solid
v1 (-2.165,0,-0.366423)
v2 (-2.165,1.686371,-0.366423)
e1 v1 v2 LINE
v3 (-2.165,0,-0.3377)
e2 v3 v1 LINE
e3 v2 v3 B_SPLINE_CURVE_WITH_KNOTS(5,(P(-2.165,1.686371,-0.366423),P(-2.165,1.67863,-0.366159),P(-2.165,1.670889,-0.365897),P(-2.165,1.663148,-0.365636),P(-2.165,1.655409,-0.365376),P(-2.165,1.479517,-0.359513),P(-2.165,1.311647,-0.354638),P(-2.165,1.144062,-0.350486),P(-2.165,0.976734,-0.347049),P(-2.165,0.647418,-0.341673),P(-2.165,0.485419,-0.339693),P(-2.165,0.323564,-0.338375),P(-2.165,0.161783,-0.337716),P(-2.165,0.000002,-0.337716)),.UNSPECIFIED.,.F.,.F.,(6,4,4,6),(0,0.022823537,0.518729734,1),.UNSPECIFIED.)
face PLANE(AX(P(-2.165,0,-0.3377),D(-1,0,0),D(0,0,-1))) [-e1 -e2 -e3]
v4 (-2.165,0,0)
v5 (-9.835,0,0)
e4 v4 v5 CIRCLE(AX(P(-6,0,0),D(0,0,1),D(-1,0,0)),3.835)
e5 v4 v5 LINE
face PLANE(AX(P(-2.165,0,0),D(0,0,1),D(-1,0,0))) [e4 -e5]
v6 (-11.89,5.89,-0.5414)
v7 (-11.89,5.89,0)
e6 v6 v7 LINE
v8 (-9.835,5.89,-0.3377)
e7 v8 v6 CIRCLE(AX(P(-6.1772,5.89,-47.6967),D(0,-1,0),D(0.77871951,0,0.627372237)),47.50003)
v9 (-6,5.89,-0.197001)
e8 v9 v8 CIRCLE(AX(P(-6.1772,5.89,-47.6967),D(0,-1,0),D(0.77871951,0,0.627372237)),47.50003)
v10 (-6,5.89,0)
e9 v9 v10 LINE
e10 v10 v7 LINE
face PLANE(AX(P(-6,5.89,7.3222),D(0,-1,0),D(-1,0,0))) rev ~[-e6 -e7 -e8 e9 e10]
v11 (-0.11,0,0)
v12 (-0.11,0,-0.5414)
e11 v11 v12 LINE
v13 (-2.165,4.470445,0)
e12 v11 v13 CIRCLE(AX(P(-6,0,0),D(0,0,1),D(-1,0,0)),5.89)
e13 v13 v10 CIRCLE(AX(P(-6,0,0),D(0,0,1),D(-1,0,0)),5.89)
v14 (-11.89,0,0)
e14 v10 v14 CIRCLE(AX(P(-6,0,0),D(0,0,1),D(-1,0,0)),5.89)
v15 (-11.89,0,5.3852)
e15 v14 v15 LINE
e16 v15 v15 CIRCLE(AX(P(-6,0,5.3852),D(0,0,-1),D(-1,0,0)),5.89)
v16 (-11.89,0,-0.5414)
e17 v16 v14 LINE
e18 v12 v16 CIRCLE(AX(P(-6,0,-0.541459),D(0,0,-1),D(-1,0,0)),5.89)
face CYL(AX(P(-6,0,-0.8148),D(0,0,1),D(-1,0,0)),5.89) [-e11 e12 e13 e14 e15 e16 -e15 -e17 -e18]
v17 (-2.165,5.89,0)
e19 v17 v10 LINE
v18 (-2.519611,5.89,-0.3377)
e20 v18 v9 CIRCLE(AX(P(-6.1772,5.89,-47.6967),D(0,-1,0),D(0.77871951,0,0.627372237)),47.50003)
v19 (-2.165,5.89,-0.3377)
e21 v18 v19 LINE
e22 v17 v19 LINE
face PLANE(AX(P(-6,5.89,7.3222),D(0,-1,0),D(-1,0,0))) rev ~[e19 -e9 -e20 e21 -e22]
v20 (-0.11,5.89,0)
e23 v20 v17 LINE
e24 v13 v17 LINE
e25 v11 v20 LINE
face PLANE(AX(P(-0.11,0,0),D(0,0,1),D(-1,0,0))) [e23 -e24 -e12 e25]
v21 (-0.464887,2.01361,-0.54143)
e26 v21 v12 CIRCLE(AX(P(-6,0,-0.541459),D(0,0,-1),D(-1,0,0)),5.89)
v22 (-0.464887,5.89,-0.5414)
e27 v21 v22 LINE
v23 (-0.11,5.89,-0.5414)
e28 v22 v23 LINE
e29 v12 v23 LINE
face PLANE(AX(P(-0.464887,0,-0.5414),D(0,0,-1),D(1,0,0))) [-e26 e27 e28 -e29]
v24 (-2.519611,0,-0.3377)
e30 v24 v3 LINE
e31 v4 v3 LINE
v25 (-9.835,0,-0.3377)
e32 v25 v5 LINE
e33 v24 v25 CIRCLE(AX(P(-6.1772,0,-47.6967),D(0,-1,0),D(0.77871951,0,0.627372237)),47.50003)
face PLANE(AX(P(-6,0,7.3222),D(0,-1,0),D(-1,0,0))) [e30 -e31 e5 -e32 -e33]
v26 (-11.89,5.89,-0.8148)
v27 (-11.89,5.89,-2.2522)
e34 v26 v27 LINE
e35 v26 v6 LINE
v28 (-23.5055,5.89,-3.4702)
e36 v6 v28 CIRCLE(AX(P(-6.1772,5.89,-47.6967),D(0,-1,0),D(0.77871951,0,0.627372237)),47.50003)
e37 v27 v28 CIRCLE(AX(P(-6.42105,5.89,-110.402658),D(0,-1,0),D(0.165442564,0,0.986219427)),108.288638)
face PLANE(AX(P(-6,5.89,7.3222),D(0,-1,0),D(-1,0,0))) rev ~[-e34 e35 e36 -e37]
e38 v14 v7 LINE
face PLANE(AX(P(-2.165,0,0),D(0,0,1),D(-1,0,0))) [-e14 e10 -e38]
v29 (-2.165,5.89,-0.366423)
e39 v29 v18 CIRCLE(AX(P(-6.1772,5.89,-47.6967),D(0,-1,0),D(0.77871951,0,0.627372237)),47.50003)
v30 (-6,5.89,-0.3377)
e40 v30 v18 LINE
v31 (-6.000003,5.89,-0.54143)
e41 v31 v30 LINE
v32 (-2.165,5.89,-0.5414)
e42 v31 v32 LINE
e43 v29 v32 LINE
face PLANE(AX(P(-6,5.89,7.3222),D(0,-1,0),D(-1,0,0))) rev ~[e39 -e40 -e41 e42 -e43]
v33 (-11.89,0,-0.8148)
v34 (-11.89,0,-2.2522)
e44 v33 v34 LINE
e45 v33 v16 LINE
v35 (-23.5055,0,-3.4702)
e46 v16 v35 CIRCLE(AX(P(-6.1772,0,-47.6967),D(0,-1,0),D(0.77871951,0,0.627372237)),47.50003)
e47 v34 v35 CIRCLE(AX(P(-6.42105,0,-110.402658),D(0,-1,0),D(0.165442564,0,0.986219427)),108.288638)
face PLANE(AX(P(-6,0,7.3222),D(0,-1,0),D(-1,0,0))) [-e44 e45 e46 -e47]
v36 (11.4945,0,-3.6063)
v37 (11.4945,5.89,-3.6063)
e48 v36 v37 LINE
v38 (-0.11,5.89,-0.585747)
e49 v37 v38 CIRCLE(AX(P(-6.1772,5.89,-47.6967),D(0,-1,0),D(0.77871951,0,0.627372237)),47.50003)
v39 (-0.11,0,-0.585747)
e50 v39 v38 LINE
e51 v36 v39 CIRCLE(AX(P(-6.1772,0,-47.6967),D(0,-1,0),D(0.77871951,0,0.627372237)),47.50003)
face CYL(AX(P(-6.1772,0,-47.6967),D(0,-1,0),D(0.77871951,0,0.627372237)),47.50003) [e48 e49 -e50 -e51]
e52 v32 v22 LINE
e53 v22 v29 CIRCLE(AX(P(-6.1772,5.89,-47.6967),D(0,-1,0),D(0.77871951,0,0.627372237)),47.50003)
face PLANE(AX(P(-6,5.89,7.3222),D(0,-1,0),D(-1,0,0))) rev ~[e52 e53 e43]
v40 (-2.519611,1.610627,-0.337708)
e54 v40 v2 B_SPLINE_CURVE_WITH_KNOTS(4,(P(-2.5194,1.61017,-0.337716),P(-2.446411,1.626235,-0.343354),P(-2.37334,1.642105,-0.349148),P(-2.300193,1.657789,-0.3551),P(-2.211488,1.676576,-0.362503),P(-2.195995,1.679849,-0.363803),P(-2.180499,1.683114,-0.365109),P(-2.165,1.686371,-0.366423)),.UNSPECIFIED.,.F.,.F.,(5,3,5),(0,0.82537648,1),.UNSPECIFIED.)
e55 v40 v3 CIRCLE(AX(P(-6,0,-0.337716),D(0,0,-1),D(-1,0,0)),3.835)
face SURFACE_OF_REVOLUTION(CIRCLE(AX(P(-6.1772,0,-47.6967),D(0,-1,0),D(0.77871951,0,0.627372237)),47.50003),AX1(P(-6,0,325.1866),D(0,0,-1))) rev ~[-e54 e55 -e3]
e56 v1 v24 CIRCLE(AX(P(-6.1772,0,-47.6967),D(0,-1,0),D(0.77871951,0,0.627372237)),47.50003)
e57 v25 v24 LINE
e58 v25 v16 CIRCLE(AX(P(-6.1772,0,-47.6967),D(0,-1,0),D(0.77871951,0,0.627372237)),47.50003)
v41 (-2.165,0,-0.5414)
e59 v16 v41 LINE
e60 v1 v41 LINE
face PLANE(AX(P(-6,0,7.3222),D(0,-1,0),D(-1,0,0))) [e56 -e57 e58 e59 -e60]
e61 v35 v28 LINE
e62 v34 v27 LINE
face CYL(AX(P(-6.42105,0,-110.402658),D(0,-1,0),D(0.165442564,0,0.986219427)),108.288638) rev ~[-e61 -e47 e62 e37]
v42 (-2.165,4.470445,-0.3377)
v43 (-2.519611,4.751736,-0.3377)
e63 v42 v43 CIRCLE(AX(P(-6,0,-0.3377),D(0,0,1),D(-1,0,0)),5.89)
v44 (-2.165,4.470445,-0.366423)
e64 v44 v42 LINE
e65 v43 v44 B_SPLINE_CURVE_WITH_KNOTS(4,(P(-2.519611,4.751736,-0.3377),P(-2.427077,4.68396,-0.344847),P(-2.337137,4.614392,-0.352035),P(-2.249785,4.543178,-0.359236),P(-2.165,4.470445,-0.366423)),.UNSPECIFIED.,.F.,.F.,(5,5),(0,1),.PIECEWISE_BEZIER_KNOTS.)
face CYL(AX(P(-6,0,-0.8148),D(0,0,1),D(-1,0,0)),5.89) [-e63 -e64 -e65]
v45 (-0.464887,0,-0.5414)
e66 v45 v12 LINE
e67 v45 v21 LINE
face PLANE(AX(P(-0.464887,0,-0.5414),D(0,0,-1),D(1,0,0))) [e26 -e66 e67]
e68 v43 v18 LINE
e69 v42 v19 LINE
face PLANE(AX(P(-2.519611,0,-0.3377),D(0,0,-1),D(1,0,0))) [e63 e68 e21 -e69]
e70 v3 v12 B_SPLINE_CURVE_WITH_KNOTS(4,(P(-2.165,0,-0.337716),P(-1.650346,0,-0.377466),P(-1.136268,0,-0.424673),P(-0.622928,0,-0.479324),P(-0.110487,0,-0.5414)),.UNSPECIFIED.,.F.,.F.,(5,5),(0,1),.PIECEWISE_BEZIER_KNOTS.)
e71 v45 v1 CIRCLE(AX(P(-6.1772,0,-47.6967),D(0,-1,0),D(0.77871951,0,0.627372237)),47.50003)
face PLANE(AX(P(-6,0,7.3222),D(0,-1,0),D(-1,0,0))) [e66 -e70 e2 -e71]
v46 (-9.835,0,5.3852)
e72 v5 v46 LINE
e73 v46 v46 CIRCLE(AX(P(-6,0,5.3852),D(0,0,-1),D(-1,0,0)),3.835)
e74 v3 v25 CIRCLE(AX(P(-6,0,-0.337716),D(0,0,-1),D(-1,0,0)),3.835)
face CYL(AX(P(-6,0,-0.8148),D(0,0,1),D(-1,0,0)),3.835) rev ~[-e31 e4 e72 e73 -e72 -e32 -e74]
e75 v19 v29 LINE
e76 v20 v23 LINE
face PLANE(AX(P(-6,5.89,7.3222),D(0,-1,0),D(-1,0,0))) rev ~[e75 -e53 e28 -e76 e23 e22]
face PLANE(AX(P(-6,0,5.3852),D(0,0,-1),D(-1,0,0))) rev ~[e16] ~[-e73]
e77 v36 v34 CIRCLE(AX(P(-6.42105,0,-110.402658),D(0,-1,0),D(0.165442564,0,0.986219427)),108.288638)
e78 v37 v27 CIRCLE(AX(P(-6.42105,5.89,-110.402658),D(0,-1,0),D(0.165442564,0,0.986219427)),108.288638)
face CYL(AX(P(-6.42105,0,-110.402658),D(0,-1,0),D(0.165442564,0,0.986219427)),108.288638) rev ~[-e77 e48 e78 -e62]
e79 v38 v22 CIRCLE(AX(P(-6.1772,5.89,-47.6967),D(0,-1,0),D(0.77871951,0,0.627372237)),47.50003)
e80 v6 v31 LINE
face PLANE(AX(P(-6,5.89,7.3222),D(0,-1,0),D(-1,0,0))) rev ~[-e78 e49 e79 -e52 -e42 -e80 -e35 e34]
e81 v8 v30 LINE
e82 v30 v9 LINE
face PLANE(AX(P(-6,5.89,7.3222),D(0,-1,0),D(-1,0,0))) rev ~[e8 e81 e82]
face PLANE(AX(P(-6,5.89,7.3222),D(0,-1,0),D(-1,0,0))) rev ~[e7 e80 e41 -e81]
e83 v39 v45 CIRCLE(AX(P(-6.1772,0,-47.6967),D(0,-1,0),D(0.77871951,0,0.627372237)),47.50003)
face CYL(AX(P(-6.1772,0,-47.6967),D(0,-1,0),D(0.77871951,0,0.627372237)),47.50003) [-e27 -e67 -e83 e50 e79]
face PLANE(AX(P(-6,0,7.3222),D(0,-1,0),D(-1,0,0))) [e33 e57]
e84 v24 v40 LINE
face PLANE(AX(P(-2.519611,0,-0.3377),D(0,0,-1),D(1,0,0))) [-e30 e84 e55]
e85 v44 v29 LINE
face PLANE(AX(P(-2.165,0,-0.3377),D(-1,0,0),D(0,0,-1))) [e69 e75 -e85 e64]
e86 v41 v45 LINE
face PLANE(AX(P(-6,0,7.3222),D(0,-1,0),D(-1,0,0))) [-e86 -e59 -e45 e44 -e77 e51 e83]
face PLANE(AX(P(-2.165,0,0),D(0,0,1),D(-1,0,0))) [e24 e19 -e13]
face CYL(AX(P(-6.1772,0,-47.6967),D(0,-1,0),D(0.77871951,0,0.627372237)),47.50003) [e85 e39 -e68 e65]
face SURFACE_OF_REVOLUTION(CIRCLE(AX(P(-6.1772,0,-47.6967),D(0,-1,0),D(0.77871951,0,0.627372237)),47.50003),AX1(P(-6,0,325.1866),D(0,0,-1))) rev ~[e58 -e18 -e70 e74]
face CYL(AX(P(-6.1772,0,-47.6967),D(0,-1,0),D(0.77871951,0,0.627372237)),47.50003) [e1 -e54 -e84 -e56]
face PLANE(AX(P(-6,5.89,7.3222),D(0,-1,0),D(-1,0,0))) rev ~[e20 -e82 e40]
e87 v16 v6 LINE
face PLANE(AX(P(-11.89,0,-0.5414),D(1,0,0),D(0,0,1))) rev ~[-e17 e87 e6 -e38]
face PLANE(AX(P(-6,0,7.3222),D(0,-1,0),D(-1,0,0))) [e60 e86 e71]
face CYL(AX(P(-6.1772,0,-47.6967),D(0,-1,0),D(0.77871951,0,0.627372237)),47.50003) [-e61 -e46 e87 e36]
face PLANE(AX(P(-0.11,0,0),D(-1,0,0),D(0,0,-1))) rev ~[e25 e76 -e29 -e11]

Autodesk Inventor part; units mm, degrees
ref_plane "YZ Plane" through (0, 0, 0) normal (1, 0, 0) x (0, 1, 0)
ref_plane "XZ Plane" through (0, 0, 0) normal (0, 1, 0) x (-1, 0, 0)
ref_plane "РабПлоскость1" through (0, 0, 0) normal (0, 0, 1) x (-1, 0, 0)
sketch "Эскиз1" plane through (0, 0, 0) normal (0, 0, 1) x (-1, 0, 0)
  circle A0 centre (6, 0) radius 3.75 projected
  line L0 (-30.812, 36.839) -> (43.1664, 36.839) projected
  line L1 (-30.812, -13.161) -> (43.1664, -13.161) projected
  circle A1 centre (6, 0) radius 6 projected
  line L2 (-17.8212, -13.161) -> (-17.8212, 36.839) projected
  line L3 (-17.8212, -13.161) -> (30.1756, -13.161) projected
  line L4 (30.1756, 36.839) -> (30.1756, -13.161) projected
  line L5 (-17.8212, 36.839) -> (30.1756, 36.839) projected
  point P0 (0, 0)
ref_plane "РабПлоскость2" through (-6, 0, 7.3222) normal (0, -1, 0) x (-1, 0, 0)
sketch "Эскиз2" plane through (-6, 0, 7.3222) normal (0, -1, 0) x (-1, 0, 0)
  line L0 (-3.75, 7.3222) -> (3.75, 7.3222) projected
  line L1 (0, -317.8644) -> (0, 181.8185)
  line L2 (3.75, 1.937) -> (-3.75, 1.937) construction
  arc A0 (3.75, 4.187) -> (-3.75, 4.187) centre (0, 4.187) ccw construction
  line L3 (3.835, 1.937) -> (-3.835, 1.937)
  line L4 (-3.835, 1.937) -> (-3.835, 8.137)
  line L5 (-3.835, 8.137) -> (3.835, 8.137)
  line L6 (3.835, 8.137) -> (3.835, 1.937)
  line L7 (6, 0) -> (6, 7.2771)
  line L8 (-6, 0) -> (-6, 7.3222)
  line L9 (5.89, 1.937) -> (-5.89, 1.937)
  line L10 (-5.89, 1.937) -> (-5.89, 8.137)
  line L11 (-5.89, 8.137) -> (5.89, 8.137) construction
  line L12 (5.89, 8.137) -> (5.89, 1.937)
  arc A1 (-36.812, 25.2187) -> (37.1664, 25.2187) centre (0.1772, 55.0189) ccw projected
  arc A2 (-17.4945, 10.9285) -> (17.5055, 10.7924) centre (0.4209, 117.7231) ccw
  line L13 (17.5055, 10.7924) -> (-17.4945, 10.9285) construction
  arc A3 (-36.812, 25.2187) -> (37.1664, 25.2187) centre (0.1772, 55.0189) ccw construction
  point P0 (0, 7.937)
  point P1 (0, 1.937)
  point P2 (0, 8.137)
  point P3 (5.89, 7.8636)
  point P4 (3.835, 7.6599)
  point P5 (0, 9.437)
  dimension "d1" = 7.5
  dimension "d2" = 7.67
  dimension "d3" = 0.2
  dimension "d4" = 12
  dimension "d5" = 11.78
  dimension "d8" = 1.3
  dimension "d9" = 35
revolve "Вращение1" add sketch "Эскиз2" angle 360 about axis through (-6, 0, 325.1866) along (0, 0, -1) contours L6 A1 L12 L9
ref_plane "РабПлоскость3" through (-6, 5.89, 2.4219) normal (0, -1, 0) x (-1, 0, 0)
sketch "Эскиз5" plane through (-6, 5.89, 2.4219) normal (0, -1, 0) x (-1, 0, 0)
  line L0 (5.89, 2.9633) -> (-5.89, 2.9633) projected
  point P0 (-6, 2.4219)
  point P1 (0, 2.9633)
sketch "Эскиз3" plane through (-6, 0, 7.3222) normal (0, -1, 0) x (-1, 0, 0)
  arc A0 (-17.4945, 10.9285) -> (17.5055, 10.7924) centre (0.4209, 117.7231) ccw projected
  arc A1 (-36.812, 25.2187) -> (37.1664, 25.2187) centre (0.1772, 55.0189) ccw projected
  line L0 (-5.89, 1.937) -> (-5.89, 8.137) projected
  line L1 (-3.835, 1.937) -> (-3.835, 8.137) projected
  line L2 (-3.835, 8.137) -> (3.835, 8.137) projected
  line L3 (5.89, 8.137) -> (5.89, 1.937) projected
  line L4 (5.89, 8.137) -> (5.89, 9.5744)
  line L5 (3.835, 7.6599) -> (-3.835, 7.6599) projected
  line L6 (5.89, 7.8636) -> (-5.89, 7.8636) projected
  line L7 (5.89, 7.8636) -> (-5.89, 7.8636) projected
  line L8 (-36.812, 7.3222) -> (37.1664, 7.3222) projected
  point P0 (-6, 7.3222)
  point P1 (5.89, 7.8636)
  point P2 (-5.5356, 7.8636)
  point P3 (-5.89, 7.3222)
  point P4 (5.89, 7.3222)
  point P5 (-3.4806, 7.6599)
  point P6 (-3.835, 7.6886)
extrude "Выдавливание1" add sketch "Эскиз3" against normal up to surface (5.89 mm away) contours A0 L4 L3 L6 A1 | A0 A1 L3 L4 | L6 L1 A1 | A1 L1 L8 L0 L6 | L3 L8 L1 L5 A1 | A1 L5 L1 L6 | A1 L5
properties part number "kick_panel"
